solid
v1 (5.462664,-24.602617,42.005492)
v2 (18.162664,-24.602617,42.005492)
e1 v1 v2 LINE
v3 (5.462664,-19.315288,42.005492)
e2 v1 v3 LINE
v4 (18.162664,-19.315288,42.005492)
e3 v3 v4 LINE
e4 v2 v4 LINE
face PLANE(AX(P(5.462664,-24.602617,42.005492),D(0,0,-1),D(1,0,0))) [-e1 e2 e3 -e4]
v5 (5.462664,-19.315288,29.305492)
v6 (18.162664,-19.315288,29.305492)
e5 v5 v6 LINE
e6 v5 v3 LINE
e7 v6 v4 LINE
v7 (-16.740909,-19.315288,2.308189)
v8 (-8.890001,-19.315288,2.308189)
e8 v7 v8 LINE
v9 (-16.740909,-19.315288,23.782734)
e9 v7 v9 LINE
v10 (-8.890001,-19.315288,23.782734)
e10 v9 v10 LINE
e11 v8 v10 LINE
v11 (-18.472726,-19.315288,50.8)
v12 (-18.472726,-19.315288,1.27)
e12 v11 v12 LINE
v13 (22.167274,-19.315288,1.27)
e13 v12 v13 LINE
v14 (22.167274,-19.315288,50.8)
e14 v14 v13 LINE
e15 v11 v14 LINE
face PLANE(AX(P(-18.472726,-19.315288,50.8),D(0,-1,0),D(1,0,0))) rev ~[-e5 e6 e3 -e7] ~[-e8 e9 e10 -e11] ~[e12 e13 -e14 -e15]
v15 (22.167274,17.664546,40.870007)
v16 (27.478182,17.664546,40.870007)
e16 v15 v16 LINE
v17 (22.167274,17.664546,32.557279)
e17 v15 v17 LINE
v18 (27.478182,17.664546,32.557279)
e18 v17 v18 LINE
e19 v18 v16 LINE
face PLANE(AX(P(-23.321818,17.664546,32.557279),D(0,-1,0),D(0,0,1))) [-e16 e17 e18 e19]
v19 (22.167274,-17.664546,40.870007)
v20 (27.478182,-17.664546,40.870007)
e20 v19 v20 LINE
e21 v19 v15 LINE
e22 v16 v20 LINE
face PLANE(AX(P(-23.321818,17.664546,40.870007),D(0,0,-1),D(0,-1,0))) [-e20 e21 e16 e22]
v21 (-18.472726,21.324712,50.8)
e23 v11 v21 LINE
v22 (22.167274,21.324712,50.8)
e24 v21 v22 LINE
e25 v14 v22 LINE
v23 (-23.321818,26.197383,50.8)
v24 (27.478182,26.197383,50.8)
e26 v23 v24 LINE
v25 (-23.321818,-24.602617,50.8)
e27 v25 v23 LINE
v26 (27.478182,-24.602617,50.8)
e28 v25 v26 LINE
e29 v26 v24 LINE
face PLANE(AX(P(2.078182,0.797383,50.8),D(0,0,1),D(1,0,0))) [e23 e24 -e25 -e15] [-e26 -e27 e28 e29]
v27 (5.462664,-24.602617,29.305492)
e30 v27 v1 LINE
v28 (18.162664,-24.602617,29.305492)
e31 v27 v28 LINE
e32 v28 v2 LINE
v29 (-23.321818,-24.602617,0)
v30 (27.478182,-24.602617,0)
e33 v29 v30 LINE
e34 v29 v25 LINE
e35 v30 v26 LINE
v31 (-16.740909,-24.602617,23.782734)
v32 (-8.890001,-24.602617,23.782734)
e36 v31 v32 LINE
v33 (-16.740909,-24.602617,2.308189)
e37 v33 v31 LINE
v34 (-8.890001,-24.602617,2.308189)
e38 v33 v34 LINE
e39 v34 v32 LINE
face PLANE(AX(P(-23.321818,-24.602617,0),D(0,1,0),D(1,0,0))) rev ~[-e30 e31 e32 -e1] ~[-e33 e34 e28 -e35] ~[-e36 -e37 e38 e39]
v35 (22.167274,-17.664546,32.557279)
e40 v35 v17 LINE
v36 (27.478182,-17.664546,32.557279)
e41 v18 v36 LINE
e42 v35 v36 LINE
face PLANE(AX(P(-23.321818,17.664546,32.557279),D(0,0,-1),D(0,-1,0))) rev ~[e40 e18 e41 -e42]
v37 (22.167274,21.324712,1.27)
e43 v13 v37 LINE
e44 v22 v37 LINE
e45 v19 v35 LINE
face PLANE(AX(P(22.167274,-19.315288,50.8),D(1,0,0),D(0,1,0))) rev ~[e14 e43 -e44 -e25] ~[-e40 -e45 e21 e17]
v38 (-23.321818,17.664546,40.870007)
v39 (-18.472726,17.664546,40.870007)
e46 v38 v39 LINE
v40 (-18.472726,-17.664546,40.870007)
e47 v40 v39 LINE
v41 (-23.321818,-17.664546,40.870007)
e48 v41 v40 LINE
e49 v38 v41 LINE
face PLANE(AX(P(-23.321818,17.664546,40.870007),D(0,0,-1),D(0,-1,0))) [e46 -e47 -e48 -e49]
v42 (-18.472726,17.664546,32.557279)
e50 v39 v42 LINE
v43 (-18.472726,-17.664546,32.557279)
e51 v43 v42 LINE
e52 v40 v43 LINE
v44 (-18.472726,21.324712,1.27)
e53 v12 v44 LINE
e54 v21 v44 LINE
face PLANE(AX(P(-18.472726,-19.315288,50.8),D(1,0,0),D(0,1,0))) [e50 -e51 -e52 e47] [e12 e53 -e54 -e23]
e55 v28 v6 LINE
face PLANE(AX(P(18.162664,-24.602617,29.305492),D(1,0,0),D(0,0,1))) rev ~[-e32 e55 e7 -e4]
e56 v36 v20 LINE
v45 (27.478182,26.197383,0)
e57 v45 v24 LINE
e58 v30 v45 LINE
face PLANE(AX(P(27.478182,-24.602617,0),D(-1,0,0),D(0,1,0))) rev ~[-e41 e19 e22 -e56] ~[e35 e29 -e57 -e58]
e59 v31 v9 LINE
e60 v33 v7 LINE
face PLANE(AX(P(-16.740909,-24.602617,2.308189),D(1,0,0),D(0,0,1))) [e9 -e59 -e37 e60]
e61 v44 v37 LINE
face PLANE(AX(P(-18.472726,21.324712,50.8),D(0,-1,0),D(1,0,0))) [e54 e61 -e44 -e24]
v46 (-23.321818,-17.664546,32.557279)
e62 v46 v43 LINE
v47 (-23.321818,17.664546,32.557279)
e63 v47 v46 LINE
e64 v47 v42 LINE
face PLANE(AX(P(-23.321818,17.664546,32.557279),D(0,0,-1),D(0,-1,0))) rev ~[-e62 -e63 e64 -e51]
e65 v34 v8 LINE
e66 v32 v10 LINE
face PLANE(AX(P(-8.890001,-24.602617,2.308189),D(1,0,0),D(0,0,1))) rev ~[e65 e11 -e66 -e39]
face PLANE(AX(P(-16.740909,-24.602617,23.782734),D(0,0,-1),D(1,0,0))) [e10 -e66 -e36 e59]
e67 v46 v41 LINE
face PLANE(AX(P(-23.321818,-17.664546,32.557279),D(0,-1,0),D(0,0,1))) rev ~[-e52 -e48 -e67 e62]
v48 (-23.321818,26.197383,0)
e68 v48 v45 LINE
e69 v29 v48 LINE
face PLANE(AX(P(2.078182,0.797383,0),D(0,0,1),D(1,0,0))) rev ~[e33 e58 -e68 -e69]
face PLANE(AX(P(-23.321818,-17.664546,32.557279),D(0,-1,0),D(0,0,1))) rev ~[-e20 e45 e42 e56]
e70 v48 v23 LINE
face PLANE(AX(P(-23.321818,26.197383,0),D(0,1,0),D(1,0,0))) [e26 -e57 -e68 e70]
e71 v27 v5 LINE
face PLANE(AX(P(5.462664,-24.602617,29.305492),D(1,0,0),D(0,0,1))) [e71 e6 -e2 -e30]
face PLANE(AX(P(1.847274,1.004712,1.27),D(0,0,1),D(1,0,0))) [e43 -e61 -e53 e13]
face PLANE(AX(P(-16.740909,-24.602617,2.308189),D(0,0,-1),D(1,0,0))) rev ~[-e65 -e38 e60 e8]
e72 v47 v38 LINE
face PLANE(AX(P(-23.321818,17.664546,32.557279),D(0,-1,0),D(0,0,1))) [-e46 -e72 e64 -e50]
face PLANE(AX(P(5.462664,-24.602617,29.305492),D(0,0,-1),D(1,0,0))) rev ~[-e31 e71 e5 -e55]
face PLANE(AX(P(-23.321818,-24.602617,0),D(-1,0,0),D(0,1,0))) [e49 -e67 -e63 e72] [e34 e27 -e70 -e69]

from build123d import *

# Parameters (mm, degrees)
F0_W     = 50.8
F0_H     = 50.8
F1_DEPTH = 50.8
F2_W     = 40.64
F2_H     = 40.64
F3_DEPTH = 49.53
F4_W     = 7.850907743
F4_H     = 21.4745448902
F5_DEPTH = 25.4
F6_W     = 12.7
F6_H     = 12.7
F7_DEPTH = 7.62
F8_W     = 35.329092294
F8_H     = 8.312728256
F9_DEPTH = 50.8


with BuildPart() as f1:
    # F0 (on Top) → F1 (new body)
    with BuildSketch(Plane.XY):
        with Locations((2.078182064, 0.7973827244)):
            Rectangle(F0_W, F0_H)
    extrude(amount=F1_DEPTH)

    # F2 (on face) → F3 (cut)
    with BuildSketch(Plane.XY.offset(50.8)):
        with Locations((1.8472736701, 1.0047121724)):
            Rectangle(F2_W, F2_H)
    extrude(amount=-F3_DEPTH, mode=Mode.SUBTRACT)

    # F4 (on face) → F5 (cut)
    with BuildSketch(Plane.XZ.offset(24.6026172756)):
        with Locations((-12.8154549748, 13.0454613827)):
            Rectangle(F4_W, F4_H)
    extrude(amount=-F5_DEPTH, mode=Mode.SUBTRACT)

    # F6 (on face) → F7 (cut)
    with BuildSketch(Plane.XZ.offset(24.6026172756)):
        with Locations((11.8126636371, 35.6554915783)):
            Rectangle(F6_W, F6_H)
    extrude(amount=-F7_DEPTH, mode=Mode.SUBTRACT)

    # F8 (on face) → F9 (cut)
    with BuildSketch(Plane(origin=(-23.321817936, 0, 0), x_dir=(0, -1, 0), z_dir=(-1, 0, 0))):
        with Locations((0, 36.7136429995)):
            Rectangle(F8_W, F8_H)
    extrude(amount=-F9_DEPTH, mode=Mode.SUBTRACT)


solid = f1.part
